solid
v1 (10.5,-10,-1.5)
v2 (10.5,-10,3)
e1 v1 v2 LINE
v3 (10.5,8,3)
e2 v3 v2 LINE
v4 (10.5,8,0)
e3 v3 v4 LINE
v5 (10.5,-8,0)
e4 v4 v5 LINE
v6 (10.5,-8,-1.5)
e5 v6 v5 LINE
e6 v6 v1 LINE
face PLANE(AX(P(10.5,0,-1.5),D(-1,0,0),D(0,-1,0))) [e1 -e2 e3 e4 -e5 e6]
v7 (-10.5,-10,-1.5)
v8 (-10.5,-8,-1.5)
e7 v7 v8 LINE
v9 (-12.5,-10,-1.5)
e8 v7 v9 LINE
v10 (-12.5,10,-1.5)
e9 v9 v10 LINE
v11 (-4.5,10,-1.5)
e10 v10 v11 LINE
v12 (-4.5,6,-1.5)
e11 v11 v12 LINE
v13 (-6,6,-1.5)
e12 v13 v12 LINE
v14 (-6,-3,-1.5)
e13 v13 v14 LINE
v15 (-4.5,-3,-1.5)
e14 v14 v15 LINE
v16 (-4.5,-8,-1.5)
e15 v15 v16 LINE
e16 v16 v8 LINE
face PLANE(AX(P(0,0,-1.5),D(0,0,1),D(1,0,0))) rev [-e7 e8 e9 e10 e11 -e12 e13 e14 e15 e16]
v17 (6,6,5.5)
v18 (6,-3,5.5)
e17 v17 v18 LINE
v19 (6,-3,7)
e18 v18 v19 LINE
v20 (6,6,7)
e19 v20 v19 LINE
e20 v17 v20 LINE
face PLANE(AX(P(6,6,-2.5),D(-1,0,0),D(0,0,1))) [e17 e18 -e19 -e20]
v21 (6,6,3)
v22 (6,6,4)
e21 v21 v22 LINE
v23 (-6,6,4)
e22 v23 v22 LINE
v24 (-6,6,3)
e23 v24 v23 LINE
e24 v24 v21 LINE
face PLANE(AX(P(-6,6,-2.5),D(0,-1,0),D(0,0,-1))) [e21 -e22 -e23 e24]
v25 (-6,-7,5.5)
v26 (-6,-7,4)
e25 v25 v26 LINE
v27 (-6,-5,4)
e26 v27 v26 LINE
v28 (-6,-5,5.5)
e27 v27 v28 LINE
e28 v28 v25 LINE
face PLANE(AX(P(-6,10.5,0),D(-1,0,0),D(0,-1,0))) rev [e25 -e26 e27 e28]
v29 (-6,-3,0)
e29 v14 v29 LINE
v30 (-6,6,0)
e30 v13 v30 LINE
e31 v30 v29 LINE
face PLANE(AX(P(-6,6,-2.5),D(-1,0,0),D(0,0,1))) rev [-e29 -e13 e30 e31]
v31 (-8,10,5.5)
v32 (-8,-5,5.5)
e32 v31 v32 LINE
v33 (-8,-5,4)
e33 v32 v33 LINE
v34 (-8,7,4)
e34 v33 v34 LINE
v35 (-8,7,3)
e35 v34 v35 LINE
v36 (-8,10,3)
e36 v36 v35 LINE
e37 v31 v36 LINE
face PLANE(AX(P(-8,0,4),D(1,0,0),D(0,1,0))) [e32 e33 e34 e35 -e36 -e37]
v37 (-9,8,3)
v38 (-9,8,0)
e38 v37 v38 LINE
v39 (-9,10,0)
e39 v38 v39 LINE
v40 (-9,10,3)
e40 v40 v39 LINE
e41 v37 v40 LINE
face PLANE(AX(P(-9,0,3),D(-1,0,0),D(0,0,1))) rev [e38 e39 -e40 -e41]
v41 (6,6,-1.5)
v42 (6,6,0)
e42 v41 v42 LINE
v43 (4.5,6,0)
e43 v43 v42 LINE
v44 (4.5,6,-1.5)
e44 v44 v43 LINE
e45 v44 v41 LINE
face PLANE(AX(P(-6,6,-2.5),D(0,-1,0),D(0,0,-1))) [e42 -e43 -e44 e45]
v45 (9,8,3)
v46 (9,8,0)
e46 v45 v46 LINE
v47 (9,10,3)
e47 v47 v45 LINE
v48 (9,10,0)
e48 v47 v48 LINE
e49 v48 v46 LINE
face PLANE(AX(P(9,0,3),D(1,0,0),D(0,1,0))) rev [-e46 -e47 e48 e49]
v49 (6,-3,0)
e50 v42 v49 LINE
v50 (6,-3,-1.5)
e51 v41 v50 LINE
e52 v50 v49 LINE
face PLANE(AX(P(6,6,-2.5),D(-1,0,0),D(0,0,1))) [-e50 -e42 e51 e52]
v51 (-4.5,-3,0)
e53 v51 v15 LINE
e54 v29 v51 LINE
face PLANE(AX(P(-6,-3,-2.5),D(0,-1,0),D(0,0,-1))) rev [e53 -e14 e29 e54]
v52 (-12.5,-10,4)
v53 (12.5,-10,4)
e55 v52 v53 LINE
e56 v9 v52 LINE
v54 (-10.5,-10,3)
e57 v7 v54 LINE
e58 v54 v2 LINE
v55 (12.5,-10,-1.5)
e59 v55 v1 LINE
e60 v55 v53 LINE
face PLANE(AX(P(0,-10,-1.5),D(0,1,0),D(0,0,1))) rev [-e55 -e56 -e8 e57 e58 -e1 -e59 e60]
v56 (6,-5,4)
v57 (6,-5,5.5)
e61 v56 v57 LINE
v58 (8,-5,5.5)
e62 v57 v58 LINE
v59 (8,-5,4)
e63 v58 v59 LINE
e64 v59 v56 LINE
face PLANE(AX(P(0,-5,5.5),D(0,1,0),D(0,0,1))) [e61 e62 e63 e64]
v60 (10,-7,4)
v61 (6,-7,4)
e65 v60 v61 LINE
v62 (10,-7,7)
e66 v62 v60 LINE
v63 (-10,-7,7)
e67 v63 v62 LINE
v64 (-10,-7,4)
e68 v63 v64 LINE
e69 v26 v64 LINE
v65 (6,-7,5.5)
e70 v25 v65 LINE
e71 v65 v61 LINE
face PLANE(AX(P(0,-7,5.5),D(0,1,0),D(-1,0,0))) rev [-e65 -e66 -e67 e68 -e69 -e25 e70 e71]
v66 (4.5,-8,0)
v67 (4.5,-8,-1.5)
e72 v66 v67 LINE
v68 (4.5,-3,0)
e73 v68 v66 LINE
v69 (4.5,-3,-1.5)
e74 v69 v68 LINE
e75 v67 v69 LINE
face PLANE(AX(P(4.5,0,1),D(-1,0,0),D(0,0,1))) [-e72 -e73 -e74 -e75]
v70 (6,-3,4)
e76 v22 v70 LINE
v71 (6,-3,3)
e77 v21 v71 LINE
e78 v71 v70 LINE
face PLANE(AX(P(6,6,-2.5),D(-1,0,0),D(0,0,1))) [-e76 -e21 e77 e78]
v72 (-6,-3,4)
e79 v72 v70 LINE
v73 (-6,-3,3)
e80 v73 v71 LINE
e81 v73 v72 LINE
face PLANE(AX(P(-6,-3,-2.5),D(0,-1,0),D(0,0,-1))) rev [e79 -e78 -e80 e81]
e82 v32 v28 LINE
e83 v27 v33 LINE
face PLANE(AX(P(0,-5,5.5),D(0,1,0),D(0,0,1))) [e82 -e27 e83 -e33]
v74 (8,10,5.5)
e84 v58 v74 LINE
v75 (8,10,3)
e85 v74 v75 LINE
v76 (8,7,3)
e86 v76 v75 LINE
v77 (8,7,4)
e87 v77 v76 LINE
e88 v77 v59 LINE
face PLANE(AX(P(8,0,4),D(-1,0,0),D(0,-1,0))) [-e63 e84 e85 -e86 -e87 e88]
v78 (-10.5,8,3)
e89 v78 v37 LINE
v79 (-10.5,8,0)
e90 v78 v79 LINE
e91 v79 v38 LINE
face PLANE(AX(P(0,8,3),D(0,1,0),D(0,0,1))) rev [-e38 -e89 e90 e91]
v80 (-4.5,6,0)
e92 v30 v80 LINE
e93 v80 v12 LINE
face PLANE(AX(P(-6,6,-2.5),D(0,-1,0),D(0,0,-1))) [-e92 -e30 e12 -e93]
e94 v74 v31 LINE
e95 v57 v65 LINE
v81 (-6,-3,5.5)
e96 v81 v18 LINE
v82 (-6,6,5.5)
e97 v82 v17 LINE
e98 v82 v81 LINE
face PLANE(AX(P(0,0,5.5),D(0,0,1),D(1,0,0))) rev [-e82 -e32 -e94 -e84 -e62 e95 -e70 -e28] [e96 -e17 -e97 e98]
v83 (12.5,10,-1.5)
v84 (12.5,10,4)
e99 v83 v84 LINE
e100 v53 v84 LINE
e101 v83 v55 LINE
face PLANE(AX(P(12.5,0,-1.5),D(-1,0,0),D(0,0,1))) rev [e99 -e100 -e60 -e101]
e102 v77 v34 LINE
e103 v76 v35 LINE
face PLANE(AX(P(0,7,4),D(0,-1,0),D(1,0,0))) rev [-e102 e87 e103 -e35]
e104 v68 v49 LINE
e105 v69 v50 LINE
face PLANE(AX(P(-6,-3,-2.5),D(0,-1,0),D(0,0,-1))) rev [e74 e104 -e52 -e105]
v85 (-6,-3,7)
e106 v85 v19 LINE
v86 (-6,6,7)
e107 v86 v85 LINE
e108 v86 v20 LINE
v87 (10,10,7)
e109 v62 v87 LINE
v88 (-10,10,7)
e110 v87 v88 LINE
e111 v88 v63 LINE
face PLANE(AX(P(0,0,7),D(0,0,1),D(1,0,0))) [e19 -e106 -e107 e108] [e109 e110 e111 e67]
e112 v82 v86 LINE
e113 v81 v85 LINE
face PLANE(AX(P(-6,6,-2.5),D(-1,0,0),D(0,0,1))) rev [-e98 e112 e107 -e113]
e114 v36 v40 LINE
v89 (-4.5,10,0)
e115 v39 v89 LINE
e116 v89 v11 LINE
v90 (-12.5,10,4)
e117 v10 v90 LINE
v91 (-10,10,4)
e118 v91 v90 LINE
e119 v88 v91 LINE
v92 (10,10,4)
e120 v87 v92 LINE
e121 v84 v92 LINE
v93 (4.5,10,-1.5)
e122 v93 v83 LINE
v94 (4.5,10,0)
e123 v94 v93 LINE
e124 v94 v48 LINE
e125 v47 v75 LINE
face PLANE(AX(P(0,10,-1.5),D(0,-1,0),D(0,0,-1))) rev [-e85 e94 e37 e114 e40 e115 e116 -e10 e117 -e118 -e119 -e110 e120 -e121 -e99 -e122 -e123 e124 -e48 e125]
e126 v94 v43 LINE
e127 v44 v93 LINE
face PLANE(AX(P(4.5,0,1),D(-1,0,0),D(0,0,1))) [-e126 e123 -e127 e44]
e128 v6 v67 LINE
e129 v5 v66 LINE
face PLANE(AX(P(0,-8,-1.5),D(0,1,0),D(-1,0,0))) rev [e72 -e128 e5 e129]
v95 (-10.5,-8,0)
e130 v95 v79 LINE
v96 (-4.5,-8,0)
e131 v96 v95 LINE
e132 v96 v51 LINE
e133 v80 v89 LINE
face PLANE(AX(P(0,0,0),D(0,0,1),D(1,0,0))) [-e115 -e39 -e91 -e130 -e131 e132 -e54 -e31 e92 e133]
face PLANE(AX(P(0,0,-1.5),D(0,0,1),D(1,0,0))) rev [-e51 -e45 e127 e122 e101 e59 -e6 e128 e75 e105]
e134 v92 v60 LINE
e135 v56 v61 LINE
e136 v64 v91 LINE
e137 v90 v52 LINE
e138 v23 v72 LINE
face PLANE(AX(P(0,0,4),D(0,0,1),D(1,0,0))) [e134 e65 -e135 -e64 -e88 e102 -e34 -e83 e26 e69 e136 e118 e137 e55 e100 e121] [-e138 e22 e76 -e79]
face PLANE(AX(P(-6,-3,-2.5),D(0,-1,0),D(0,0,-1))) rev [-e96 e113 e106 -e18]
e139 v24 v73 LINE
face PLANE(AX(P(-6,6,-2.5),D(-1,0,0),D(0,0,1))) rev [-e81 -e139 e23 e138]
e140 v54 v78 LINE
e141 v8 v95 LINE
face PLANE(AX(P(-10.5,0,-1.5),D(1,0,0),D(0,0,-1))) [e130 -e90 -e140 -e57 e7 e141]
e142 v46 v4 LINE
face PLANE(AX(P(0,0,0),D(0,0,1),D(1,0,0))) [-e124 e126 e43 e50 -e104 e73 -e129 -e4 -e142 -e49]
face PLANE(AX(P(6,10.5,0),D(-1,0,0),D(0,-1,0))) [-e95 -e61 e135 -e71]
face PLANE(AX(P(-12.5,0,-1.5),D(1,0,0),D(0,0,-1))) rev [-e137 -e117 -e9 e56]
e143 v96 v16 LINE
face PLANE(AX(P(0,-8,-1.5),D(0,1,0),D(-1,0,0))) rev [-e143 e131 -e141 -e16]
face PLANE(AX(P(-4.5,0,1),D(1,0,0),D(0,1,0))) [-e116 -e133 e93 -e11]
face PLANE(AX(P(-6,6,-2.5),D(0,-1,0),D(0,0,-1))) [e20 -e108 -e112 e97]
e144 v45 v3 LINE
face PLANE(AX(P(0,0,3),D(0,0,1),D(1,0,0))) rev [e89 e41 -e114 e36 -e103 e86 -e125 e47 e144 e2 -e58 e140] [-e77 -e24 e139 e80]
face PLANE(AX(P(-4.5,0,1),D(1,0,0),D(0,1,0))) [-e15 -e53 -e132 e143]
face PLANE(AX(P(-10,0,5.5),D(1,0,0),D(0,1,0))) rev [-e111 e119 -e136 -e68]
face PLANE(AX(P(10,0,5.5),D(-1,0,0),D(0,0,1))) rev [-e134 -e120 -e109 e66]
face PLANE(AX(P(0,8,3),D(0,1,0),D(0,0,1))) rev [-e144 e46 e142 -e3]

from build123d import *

# Parameters (mm, degrees)
RESSALTO_EXTRUS_O1_DEPTH  = 1.5
RESSALTO_EXTRUS_O2_DEPTH  = 3
ESBO_O2_W                 = 1
ESBO_O2_H                 = 15
ESBO_O2_H_2               = 2
RESSALTO_EXTRUS_O3_DEPTH  = 1
ESBO_O2_4_W               = 1
ESBO_O2_4_H               = 2
ESBO_O2_4_H_2             = 15
RESSALTO_EXTRUS_O4_DEPTH  = 2.5
ESBO_O3_W                 = 20
ESBO_O3_H                 = 17
RESSALTO_EXTRUS_O5_DEPTH  = 1.5
CORTE_EXTRUS_O1_START     = -2
CORTE_EXTRUS_O1_OUTLINE_W = 12
CORTE_EXTRUS_O1_OUTLINE_H = 1.5
CORTE_EXTRUS_O1_DEPTH     = 2
ESBO_O5_W                 = 9
ESBO_O5_H                 = 2
ESBO_O5_H_2               = 16
CORTE_EXTRUS_O2_DEPTH     = 2.5
ESBO_O6_W                 = 12
ESBO_O6_H                 = 9
CORTE_EXTRUS_O3_DEPTH     = 9.5


# Read off the part's stored shape, not the designer's step: Corte-extrusão1
with BuildPart() as part:
    # Esboço1 → Ressalto-extrusão1 (new body)
    with BuildSketch(Plane.XY):
        Polygon((12.5, 10), (-12.5, 10), (-12.5, -10), (-10.5, -10), (-10.5, -8), (10.5, -8), (10.5, -10), (12.5, -10), align=None)
    extrude(amount=-RESSALTO_EXTRUS_O1_DEPTH)

    # Esboço1<3> → Ressalto-extrusão2 (add)
    with BuildSketch(Plane.XY):
        Polygon((-10.5, 8), (-9, 8), (-9, 10), (-12.5, 10), (-12.5, -10), (-10.5, -10), (-10.5, -8), align=None)
        Polygon((9, 10), (9, 8), (10.5, 8), (10.5, -8), (10.5, -10), (12.5, -10), (12.5, 10), align=None)
    extrude(amount=RESSALTO_EXTRUS_O2_DEPTH)

    # Esboço2 → Ressalto-extrusão3 (add)
    with BuildSketch(Plane.XY.offset(3)):
        Polygon((-10, 10), (-12.5, 10), (-12.5, -10), (-10.5, -10), (-10.5, 8), (-10, 8), align=None)
        Polygon((-10.5, 8), (-10.5, -10), (12.5, -10), (12.5, 10), (10, 10), (10, 8), (10, -7), (9, -7), (0, -7), (-9, -7), (-10, -7), (-10, 8), align=None)
        with Locations((-9.5, 0.5)):
            Rectangle(ESBO_O2_W, ESBO_O2_H)
        with Locations((-9.5, 9)):
            Rectangle(ESBO_O2_W, ESBO_O2_H_2)
        Polygon((-8, 8), (-9, 8), (-9, -7), (0, -7), (9, -7), (9, 8), (8, 8), (8, 7), (8, -5), (0, -5), (-8, -5), (-8, 7), align=None)
        with Locations((-8.5, 9)):
            Rectangle(ESBO_O2_W, ESBO_O2_H_2)
        with Locations((8.5, 9)):
            Rectangle(ESBO_O2_W, ESBO_O2_H_2)
        with Locations((9.5, 9)):
            Rectangle(ESBO_O2_W, ESBO_O2_H_2)
        with Locations((9.5, 0.5)):
            Rectangle(ESBO_O2_W, ESBO_O2_H)
        Polygon((8, -5), (8, 7), (0, 7), (0, 0), (0, -5), align=None)
        Polygon((0, 7), (-8, 7), (-8, -5), (0, -5), (0, 0), align=None)
    extrude(amount=RESSALTO_EXTRUS_O3_DEPTH)

    # Esboço2<4> → Ressalto-extrusão4 (add)
    with BuildSketch(Plane.XY.offset(3)):
        with Locations((-8.5, 9)):
            Rectangle(ESBO_O2_4_W, ESBO_O2_4_H)
        with Locations((-9.5, 9)):
            Rectangle(ESBO_O2_4_W, ESBO_O2_4_H)
        with Locations((-9.5, 0.5)):
            Rectangle(ESBO_O2_4_W, ESBO_O2_4_H_2)
        Polygon((-8, 8), (-9, 8), (-9, -7), (0, -7), (9, -7), (9, 8), (8, 8), (8, 7), (8, -5), (0, -5), (-8, -5), (-8, 7), align=None)
        with Locations((9.5, 0.5)):
            Rectangle(ESBO_O2_4_W, ESBO_O2_4_H_2)
        with Locations((8.5, 9)):
            Rectangle(ESBO_O2_4_W, ESBO_O2_4_H)
        with Locations((9.5, 9)):
            Rectangle(ESBO_O2_4_W, ESBO_O2_4_H)
    extrude(amount=RESSALTO_EXTRUS_O4_DEPTH)

    # Esboço3 → Ressalto-extrusão5 (add)
    with BuildSketch(Plane.XY.offset(5.5)):
        with Locations((0, 1.5)):
            Rectangle(ESBO_O3_W, ESBO_O3_H)
    extrude(amount=RESSALTO_EXTRUS_O5_DEPTH)

    # Corte-extrusão1 outline → Corte-extrusão1 (cut)
    with BuildSketch(Plane.XZ.offset(7).offset(CORTE_EXTRUS_O1_START)):
        with Locations((0, 4.75)):
            Rectangle(CORTE_EXTRUS_O1_OUTLINE_W, CORTE_EXTRUS_O1_OUTLINE_H)
    extrude(amount=CORTE_EXTRUS_O1_DEPTH, mode=Mode.SUBTRACT)

    # Esboço5 → Corte-extrusão2 (cut)
    with BuildSketch(Plane(origin=(0, 0, -1.5), x_dir=(-1, 0, 0), z_dir=(0, 0, -1))):
        with Locations((0, 9)):
            Rectangle(ESBO_O5_W, ESBO_O5_H)
        Rectangle(ESBO_O5_W, ESBO_O5_H_2)
    extrude(amount=-CORTE_EXTRUS_O2_DEPTH, mode=Mode.SUBTRACT)

    # Esboço6 → Corte-extrusão3 (cut)
    with BuildSketch(Plane.XY.offset(7)):
        with Locations((0, 1.5)):
            Rectangle(ESBO_O6_W, ESBO_O6_H)
    extrude(amount=-CORTE_EXTRUS_O3_DEPTH, mode=Mode.SUBTRACT)


solid = part.part
